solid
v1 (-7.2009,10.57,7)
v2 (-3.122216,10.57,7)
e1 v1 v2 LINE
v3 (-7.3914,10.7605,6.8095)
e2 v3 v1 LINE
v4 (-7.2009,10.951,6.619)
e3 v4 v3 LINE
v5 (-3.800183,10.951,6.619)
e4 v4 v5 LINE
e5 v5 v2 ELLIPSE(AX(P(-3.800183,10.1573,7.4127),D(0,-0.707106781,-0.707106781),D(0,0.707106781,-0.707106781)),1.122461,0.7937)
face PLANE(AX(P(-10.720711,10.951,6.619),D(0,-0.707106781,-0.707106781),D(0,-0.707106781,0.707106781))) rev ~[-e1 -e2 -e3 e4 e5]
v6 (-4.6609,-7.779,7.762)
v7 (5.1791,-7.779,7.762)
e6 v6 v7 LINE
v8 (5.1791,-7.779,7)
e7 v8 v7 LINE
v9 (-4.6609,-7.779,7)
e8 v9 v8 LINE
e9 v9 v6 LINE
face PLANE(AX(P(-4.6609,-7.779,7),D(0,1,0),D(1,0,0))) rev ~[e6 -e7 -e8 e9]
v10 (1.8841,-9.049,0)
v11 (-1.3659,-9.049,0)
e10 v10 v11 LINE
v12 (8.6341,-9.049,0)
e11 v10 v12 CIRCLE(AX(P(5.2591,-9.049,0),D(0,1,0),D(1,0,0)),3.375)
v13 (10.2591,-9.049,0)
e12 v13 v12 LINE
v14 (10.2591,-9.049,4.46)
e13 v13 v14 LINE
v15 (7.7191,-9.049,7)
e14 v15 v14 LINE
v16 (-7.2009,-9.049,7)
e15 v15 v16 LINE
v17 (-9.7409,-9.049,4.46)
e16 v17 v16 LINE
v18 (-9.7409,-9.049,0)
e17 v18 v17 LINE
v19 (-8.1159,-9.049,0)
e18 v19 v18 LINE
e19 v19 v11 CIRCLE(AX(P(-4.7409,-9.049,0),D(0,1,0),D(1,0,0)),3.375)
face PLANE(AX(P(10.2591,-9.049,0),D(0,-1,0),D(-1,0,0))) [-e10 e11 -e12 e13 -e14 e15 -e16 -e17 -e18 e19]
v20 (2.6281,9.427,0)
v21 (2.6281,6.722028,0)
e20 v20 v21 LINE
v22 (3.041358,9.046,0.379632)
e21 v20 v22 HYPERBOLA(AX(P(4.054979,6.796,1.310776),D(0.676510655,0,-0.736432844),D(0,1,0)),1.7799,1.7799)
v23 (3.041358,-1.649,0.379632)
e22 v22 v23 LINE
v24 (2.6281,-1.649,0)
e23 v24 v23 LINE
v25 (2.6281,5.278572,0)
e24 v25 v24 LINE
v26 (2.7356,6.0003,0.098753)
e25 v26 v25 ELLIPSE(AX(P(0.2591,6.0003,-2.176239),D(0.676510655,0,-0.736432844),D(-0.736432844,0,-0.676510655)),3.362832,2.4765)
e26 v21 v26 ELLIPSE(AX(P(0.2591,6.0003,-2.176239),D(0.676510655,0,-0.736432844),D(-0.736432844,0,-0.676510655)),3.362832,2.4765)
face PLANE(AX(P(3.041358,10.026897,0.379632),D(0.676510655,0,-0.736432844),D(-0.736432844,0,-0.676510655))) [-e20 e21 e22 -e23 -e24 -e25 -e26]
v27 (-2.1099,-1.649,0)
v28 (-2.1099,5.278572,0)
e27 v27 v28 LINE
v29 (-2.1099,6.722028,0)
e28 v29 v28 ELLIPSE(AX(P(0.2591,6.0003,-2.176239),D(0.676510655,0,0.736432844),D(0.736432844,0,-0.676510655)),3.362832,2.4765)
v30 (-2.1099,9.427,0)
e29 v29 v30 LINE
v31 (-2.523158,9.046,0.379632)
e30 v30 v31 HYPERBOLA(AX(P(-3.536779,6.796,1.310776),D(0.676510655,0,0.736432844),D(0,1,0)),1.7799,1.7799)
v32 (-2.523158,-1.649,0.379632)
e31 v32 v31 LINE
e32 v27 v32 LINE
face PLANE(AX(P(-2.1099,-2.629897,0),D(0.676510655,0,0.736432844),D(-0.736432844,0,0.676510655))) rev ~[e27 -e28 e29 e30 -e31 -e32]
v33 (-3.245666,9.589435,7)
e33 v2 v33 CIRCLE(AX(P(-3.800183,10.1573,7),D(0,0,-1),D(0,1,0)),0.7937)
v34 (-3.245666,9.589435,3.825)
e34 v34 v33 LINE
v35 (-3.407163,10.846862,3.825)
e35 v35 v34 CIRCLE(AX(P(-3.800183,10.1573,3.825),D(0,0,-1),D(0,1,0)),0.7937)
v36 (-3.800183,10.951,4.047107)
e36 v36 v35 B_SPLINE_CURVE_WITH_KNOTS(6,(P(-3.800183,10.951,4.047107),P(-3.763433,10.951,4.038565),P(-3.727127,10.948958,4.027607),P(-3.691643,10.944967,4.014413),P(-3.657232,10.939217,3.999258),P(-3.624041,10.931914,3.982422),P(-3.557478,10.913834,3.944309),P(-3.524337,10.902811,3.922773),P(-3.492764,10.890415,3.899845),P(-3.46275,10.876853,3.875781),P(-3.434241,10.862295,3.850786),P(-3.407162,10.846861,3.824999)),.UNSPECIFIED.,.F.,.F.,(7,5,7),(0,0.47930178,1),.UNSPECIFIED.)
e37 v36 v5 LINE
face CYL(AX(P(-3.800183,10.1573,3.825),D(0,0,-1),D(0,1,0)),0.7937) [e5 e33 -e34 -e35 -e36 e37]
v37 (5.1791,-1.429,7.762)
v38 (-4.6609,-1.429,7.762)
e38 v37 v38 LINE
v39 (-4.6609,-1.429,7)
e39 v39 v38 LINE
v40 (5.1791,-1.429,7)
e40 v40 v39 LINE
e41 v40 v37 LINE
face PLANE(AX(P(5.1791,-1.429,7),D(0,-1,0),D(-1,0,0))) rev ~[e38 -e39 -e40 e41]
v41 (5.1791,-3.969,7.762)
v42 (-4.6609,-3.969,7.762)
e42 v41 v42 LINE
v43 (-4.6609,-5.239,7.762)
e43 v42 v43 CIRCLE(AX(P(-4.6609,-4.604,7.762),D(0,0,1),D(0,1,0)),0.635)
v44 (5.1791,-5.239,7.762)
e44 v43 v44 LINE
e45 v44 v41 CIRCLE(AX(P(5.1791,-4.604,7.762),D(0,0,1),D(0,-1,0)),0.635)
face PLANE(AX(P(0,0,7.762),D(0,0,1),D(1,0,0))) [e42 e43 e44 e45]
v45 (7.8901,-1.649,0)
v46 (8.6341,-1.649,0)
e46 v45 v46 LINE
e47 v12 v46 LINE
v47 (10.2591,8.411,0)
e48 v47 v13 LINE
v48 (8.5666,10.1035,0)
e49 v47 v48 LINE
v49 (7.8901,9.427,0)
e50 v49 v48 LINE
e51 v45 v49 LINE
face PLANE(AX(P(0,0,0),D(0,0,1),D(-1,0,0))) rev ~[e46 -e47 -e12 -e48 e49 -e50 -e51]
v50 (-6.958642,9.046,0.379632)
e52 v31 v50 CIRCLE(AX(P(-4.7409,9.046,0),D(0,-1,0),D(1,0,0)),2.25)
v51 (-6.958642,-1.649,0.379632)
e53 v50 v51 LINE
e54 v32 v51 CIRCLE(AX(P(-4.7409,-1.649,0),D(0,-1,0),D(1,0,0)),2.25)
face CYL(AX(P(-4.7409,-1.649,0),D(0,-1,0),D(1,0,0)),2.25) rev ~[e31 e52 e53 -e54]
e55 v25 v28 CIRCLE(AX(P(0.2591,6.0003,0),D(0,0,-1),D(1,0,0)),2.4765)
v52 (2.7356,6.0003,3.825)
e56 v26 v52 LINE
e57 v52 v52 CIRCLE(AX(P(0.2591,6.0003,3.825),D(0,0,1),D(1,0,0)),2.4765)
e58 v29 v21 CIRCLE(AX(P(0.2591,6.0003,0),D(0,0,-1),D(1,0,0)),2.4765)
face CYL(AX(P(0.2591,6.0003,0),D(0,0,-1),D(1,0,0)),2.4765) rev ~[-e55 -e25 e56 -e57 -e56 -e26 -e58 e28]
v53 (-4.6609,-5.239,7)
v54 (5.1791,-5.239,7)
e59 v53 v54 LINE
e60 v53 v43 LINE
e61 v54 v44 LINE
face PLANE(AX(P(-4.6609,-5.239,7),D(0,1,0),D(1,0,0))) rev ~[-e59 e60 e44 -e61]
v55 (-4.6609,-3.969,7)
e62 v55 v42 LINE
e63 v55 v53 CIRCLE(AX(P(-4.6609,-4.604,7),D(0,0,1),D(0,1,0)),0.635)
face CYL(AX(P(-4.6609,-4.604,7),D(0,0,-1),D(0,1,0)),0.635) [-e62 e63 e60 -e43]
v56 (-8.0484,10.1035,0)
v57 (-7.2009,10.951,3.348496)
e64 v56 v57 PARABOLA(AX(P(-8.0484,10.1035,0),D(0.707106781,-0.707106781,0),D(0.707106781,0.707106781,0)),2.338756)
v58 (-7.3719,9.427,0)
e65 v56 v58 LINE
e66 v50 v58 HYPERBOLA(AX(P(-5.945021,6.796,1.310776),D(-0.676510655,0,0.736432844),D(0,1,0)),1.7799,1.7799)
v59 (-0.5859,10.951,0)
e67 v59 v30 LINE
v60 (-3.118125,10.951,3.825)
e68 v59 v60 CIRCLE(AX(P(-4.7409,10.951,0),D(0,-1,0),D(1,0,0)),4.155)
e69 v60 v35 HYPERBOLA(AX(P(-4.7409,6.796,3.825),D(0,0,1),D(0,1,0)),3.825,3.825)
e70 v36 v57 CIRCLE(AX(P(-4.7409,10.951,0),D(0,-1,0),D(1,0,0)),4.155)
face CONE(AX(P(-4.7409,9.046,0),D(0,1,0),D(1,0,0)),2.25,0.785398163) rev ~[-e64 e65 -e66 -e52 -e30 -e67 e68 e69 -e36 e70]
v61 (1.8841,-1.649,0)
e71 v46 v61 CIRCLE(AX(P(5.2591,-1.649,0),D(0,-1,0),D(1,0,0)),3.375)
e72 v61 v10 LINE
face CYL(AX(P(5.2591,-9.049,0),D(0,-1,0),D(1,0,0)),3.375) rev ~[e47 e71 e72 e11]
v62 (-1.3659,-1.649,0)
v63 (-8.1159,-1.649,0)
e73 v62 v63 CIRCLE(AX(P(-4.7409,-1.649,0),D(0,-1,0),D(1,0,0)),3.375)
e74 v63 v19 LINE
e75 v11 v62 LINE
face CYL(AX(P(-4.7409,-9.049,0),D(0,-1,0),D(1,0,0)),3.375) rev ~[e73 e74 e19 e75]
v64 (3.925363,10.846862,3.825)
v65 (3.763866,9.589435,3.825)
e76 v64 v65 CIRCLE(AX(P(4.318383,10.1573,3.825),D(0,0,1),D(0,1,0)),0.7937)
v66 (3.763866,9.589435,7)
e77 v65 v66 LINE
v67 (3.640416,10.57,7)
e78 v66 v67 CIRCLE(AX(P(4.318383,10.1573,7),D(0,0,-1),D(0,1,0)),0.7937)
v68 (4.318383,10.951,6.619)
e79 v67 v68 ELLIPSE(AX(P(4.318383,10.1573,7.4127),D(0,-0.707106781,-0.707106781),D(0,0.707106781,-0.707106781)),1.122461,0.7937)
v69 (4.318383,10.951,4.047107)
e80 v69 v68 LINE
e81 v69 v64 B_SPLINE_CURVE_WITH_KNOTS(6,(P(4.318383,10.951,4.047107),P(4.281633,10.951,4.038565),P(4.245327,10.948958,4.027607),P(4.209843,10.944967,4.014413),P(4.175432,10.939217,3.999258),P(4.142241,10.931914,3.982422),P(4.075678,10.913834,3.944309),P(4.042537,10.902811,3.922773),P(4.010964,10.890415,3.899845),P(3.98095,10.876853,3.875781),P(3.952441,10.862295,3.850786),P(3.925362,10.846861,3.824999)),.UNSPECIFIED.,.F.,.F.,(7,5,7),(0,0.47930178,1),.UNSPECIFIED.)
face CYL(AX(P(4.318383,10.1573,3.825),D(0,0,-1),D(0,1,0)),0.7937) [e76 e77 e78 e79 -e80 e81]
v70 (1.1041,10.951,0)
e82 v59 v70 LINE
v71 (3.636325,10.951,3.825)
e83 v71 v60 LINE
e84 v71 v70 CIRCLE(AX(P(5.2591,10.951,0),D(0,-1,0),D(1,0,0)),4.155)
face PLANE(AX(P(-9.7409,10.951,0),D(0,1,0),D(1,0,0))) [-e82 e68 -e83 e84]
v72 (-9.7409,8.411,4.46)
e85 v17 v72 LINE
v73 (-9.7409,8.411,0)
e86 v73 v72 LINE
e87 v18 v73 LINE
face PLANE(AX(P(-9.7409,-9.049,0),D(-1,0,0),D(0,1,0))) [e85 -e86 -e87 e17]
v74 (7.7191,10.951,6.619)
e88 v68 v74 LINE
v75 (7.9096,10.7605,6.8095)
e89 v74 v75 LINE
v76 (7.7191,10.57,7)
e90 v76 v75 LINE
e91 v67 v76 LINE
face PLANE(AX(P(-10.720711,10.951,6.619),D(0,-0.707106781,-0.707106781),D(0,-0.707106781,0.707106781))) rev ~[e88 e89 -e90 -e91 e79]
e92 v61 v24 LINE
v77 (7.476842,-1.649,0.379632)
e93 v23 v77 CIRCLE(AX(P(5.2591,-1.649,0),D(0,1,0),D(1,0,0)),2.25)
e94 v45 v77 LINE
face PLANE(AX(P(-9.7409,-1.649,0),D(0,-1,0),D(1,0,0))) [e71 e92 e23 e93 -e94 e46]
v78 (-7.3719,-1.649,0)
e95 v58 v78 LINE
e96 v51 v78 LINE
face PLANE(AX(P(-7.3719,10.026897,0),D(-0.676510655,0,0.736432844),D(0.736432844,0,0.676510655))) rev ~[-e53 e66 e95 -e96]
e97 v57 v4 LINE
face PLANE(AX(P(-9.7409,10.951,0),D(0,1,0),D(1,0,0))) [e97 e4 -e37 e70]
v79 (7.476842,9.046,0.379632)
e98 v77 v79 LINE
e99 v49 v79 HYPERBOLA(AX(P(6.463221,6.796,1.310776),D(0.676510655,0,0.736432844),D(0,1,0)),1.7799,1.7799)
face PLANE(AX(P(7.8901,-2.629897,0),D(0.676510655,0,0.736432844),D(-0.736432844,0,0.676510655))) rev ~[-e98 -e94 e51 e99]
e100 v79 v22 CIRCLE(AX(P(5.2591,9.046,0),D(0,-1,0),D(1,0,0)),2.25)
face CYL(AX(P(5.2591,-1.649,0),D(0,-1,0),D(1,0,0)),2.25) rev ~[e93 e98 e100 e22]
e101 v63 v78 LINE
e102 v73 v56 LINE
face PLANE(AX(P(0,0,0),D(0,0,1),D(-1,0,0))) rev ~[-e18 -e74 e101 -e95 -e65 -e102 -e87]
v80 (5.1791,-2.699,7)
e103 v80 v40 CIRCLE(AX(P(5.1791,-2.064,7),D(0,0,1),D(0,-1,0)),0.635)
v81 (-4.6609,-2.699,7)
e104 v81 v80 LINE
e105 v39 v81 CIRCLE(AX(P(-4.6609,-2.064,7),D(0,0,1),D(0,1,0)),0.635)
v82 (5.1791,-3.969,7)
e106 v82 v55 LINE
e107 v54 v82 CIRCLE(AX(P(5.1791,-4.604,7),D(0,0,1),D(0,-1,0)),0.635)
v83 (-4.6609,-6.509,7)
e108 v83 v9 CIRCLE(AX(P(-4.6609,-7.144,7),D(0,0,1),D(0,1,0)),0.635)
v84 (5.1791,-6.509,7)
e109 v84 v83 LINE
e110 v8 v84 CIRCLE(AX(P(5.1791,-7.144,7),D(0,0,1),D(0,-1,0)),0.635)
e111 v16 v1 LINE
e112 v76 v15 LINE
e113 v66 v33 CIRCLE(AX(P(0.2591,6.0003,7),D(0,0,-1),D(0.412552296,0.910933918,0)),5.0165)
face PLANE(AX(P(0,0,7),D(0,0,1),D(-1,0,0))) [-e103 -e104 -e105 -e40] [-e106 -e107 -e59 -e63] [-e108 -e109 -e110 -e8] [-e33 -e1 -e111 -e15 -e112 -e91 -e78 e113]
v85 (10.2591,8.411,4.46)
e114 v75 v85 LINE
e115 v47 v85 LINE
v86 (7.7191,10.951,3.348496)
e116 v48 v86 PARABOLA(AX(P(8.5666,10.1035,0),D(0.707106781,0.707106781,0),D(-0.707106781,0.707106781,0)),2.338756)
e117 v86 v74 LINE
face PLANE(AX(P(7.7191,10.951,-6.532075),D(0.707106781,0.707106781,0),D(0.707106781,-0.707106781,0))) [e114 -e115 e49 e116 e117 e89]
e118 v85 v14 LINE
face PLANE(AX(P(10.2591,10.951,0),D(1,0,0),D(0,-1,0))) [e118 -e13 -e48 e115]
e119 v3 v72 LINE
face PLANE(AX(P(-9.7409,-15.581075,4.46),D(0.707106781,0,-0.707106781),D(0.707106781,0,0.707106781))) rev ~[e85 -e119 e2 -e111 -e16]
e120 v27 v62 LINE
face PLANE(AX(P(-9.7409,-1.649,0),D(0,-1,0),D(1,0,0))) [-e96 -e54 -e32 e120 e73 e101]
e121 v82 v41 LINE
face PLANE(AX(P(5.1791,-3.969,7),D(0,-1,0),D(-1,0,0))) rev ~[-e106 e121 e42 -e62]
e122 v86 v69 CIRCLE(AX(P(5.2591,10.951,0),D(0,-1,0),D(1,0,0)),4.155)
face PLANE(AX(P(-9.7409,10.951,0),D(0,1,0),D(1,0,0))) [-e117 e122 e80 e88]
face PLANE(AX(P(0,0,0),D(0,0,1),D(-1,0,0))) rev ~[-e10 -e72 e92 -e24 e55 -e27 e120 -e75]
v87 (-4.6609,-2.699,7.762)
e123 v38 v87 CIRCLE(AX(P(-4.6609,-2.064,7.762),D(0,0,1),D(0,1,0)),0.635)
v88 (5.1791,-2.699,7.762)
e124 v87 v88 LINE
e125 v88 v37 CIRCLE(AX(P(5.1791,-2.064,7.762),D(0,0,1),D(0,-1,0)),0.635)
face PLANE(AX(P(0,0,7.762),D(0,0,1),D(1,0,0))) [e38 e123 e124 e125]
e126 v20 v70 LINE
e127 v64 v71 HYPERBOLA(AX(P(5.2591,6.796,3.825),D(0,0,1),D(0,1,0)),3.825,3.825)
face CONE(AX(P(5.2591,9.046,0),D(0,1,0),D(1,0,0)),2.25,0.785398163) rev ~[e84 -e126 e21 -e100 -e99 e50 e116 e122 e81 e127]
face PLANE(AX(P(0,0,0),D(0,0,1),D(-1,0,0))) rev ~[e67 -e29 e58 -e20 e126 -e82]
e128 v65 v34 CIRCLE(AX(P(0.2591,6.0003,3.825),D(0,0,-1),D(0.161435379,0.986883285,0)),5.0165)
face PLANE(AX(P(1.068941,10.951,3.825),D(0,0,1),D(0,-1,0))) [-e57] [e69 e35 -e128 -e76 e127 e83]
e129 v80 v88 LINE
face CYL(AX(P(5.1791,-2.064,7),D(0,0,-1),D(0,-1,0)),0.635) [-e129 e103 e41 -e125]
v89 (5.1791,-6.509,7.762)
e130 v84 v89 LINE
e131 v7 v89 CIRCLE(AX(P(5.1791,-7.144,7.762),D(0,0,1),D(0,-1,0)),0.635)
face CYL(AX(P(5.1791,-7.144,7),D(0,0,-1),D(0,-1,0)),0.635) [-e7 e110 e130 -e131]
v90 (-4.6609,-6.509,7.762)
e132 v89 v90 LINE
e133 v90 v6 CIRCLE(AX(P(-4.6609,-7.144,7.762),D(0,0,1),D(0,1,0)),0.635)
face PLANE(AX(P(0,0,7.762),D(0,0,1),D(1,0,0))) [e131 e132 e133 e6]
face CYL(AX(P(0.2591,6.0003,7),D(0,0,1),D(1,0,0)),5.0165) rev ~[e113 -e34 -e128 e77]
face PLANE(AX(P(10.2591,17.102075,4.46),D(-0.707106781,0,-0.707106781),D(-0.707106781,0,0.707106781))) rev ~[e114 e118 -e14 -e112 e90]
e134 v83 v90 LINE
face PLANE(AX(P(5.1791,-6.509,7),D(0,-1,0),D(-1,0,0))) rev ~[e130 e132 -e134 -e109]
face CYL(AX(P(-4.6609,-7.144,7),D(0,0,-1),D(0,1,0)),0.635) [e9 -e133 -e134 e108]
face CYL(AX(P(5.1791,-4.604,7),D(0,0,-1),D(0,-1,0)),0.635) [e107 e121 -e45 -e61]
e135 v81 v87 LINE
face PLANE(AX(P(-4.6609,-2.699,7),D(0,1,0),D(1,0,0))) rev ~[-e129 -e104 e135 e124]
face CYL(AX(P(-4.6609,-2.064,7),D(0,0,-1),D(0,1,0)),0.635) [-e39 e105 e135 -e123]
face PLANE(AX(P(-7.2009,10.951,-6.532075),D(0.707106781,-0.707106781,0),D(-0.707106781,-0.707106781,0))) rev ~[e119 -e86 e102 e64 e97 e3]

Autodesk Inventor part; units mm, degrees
ref_plane "YZ Plane" through (0, 0, 0) normal (1, 0, 0) x (0, 1, 0)
ref_plane "XZ Plane" through (0, 0, 0) normal (0, 1, 0) x (-1, 0, 0)
ref_plane "XY Plane" through (0, 0, 0) normal (0, 0, 1) x (1, 0, 0)
sketch "Sketch1" plane through (0, 0, 0) normal (0, 1, 0) x (-1, 0, 0)
  line L0 (-10.2591, 9.049) -> (9.7409, 9.049)
  line L1 (9.7409, 9.049) -> (9.7409, -10.951)
  line L2 (9.7409, -10.951) -> (-10.2591, -10.951)
  line L3 (-10.2591, -10.951) -> (-10.2591, 9.049)
  point P0 (0, 0)
  dimension "d0" = 20
  dimension "d1" = 20
extrude "Extrusion1" add sketch "Sketch1" along normal blind 7
sketch "Sketch2" plane through (-9.7409, 0, 9.049) normal (0, 0, 1) x (1, 0, 0)
  line L0 (20, 0) -> (0, 0) projected
  line L1 (20, 0) -> (20, 7) projected
  line L2 (0, 0) -> (0, 7) projected
  circle A0 centre (15, 0) radius 3.375
  circle A1 centre (5, 0) radius 3.375
  point P0 (9.7409, 0)
  dimension "d4" = 6.75
  dimension "d5" = 6.75
  dimension "d6" = 5
  dimension "d7" = 5
  dimension "d32" = 10
extrude "Extrusion2" cut sketch "Sketch2" against normal blind 7.4
sketch "Sketch3" plane through (-9.7409, 0, 1.649) normal (0, 0, 1) x (1, 0, 0)
  arc A0 (8.375, 0) -> (1.625, 0) centre (5, 0) ccw projected
  line L0 (18.375, 0) -> (11.625, 0) projected
  arc A1 (18.375, 0) -> (11.625, 0) centre (15, 0) ccw projected
  circle A2 centre (15, 0) radius 2.25
  circle A3 centre (5, 0) radius 2.25
  point P0 (9.7409, 0)
  dimension "d10" = 4.5
  dimension "d11" = 4.5
extrude "Extrusion3" cut sketch "Sketch3" against normal through all contours A2 L0 | L0 A2 | A3
sketch "Sketch4" plane through (0, 0, 0) normal (0, -1, 0) x (1, 0, 0)
  line L0 (-2.4909, 1.649) -> (-2.4909, -10.951) projected
  line L1 (3.0091, -10.951) -> (3.0091, 1.649) projected
  circle A0 centre (0.2591, -6.0003) radius 2.4765
  point P0 (0, 0)
  dimension "d14" = 4.953
  dimension "d15" = 5.5
  dimension "d16" = 2.75
extrude "Extrusion4" cut sketch "Sketch4" against normal through all
chamfer "Chamfer1" distance 1.905 angle 45 2 edges at (5.2591, 2.25, -10.951) (-4.7409, 2.25, -10.951)
chamfer "Chamfer2" distance 0.381 angle 45 5 edges at (-2.4909, 0, -3.6985) (-6.9909, 0, -3.6985) (7.5091, 0, -3.6985) (3.0091, 0, -3.6985) (0.2591, 7, -10.951)
chamfer "Chamfer3" distance 2.54 angle 45 4 edges at (-9.7409, 7, -0.7605) (10.2591, 7, -0.7605) (-9.7409, 3.3095, -10.951) (10.2591, 3.3095, -10.951)
sketch "Sketch5" plane through (0, 7, 0) normal (0, 1, 0) x (1, 0, 0)
  line L0 (-7.2009, 10.57) -> (7.7191, 10.57) projected
  circle A0 centre (0.2591, 6.0003) radius 2.4765 projected
  line L1 (3.1554, 0.9838) -> (-2.6371, 0.9838)
  line L2 (-2.6371, 0.9838) -> (-5.5334, 6.0003)
  line L3 (-5.5334, 6.0003) -> (-2.6371, 11.0168)
  line L4 (-2.6371, 11.0168) -> (3.1554, 11.0168)
  line L5 (3.1554, 11.0168) -> (6.0517, 6.0003)
  line L6 (6.0517, 6.0003) -> (3.1554, 0.9838)
  circle A1 centre (0.2591, 6.0003) radius 5.0165
  point P0 (0, 0)
  dimension "d29" = 10.033
  dimension "d47" = 10.033
extrude "Extrusion5" cut sketch "Sketch5" against normal blind 3.175 contours A1 L0 | L0 A1
sketch "Sketch6" plane through (0, 7, 0) normal (0, 1, 0) x (1, 0, 0)
  line L0 (-7.2009, -9.049) -> (-7.2009, 10.57) projected
  line L1 (-7.2009, -9.049) -> (7.7191, -9.049) projected
  line L2 (7.7191, 10.57) -> (7.7191, -9.049) projected
  line L3 (-7.2009, 10.57) -> (7.7191, 10.57) projected
  line L4 (-4.6609, -7.144) -> (5.1791, -7.144) construction
  line L5 (-4.6609, -7.779) -> (5.1791, -7.779)
  line L6 (5.1791, -6.509) -> (-4.6609, -6.509)
  arc A0 (-4.6609, -6.509) -> (-4.6609, -7.779) centre (-4.6609, -7.144) ccw
  arc A1 (5.1791, -7.779) -> (5.1791, -6.509) centre (5.1791, -7.144) ccw
  line L7 (-4.6609, -5.239) -> (5.1791, -5.239)
  line L8 (5.1791, -3.969) -> (-4.6609, -3.969)
  arc A2 (-4.6609, -3.969) -> (-4.6609, -5.239) centre (-4.6609, -4.604) ccw
  arc A3 (5.1791, -5.239) -> (5.1791, -3.969) centre (5.1791, -4.604) ccw
  line L9 (-4.6609, -2.699) -> (5.1791, -2.699)
  line L10 (5.1791, -1.429) -> (-4.6609, -1.429)
  arc A4 (-4.6609, -1.429) -> (-4.6609, -2.699) centre (-4.6609, -2.064) ccw
  arc A5 (5.1791, -2.699) -> (5.1791, -1.429) centre (5.1791, -2.064) ccw
  point P0 (3.4133, 10.57)
  point P1 (0, 0)
  point P2 (0.2591, -7.144)
  dimension "d33" = 1.27
  dimension "d34" = 2.54
  dimension "d35" = 2.54
  dimension "d36" = 1.905
  dimension "d39" = 2.54
extrude "Extrusion6" add sketch "Sketch6" along normal blind 0.762 contours A0 L6 A1 L5 | A2 L8 A3 L7 | A4 L10 A5 L9
fillet "Fillet1" radius 0.7937 2 edges at (1.0688, 5.222, -10.951) (-0.5505, 5.222, -10.951)
move or copy body "Move Body1" bodies to move or copy 1 copy no rotation origin (0, 0, 0) rotation axis (1, 0, 0) rotation angle 90
equation "\"d16\" = 0.5 * d15"
properties part number "key_half_screw"
